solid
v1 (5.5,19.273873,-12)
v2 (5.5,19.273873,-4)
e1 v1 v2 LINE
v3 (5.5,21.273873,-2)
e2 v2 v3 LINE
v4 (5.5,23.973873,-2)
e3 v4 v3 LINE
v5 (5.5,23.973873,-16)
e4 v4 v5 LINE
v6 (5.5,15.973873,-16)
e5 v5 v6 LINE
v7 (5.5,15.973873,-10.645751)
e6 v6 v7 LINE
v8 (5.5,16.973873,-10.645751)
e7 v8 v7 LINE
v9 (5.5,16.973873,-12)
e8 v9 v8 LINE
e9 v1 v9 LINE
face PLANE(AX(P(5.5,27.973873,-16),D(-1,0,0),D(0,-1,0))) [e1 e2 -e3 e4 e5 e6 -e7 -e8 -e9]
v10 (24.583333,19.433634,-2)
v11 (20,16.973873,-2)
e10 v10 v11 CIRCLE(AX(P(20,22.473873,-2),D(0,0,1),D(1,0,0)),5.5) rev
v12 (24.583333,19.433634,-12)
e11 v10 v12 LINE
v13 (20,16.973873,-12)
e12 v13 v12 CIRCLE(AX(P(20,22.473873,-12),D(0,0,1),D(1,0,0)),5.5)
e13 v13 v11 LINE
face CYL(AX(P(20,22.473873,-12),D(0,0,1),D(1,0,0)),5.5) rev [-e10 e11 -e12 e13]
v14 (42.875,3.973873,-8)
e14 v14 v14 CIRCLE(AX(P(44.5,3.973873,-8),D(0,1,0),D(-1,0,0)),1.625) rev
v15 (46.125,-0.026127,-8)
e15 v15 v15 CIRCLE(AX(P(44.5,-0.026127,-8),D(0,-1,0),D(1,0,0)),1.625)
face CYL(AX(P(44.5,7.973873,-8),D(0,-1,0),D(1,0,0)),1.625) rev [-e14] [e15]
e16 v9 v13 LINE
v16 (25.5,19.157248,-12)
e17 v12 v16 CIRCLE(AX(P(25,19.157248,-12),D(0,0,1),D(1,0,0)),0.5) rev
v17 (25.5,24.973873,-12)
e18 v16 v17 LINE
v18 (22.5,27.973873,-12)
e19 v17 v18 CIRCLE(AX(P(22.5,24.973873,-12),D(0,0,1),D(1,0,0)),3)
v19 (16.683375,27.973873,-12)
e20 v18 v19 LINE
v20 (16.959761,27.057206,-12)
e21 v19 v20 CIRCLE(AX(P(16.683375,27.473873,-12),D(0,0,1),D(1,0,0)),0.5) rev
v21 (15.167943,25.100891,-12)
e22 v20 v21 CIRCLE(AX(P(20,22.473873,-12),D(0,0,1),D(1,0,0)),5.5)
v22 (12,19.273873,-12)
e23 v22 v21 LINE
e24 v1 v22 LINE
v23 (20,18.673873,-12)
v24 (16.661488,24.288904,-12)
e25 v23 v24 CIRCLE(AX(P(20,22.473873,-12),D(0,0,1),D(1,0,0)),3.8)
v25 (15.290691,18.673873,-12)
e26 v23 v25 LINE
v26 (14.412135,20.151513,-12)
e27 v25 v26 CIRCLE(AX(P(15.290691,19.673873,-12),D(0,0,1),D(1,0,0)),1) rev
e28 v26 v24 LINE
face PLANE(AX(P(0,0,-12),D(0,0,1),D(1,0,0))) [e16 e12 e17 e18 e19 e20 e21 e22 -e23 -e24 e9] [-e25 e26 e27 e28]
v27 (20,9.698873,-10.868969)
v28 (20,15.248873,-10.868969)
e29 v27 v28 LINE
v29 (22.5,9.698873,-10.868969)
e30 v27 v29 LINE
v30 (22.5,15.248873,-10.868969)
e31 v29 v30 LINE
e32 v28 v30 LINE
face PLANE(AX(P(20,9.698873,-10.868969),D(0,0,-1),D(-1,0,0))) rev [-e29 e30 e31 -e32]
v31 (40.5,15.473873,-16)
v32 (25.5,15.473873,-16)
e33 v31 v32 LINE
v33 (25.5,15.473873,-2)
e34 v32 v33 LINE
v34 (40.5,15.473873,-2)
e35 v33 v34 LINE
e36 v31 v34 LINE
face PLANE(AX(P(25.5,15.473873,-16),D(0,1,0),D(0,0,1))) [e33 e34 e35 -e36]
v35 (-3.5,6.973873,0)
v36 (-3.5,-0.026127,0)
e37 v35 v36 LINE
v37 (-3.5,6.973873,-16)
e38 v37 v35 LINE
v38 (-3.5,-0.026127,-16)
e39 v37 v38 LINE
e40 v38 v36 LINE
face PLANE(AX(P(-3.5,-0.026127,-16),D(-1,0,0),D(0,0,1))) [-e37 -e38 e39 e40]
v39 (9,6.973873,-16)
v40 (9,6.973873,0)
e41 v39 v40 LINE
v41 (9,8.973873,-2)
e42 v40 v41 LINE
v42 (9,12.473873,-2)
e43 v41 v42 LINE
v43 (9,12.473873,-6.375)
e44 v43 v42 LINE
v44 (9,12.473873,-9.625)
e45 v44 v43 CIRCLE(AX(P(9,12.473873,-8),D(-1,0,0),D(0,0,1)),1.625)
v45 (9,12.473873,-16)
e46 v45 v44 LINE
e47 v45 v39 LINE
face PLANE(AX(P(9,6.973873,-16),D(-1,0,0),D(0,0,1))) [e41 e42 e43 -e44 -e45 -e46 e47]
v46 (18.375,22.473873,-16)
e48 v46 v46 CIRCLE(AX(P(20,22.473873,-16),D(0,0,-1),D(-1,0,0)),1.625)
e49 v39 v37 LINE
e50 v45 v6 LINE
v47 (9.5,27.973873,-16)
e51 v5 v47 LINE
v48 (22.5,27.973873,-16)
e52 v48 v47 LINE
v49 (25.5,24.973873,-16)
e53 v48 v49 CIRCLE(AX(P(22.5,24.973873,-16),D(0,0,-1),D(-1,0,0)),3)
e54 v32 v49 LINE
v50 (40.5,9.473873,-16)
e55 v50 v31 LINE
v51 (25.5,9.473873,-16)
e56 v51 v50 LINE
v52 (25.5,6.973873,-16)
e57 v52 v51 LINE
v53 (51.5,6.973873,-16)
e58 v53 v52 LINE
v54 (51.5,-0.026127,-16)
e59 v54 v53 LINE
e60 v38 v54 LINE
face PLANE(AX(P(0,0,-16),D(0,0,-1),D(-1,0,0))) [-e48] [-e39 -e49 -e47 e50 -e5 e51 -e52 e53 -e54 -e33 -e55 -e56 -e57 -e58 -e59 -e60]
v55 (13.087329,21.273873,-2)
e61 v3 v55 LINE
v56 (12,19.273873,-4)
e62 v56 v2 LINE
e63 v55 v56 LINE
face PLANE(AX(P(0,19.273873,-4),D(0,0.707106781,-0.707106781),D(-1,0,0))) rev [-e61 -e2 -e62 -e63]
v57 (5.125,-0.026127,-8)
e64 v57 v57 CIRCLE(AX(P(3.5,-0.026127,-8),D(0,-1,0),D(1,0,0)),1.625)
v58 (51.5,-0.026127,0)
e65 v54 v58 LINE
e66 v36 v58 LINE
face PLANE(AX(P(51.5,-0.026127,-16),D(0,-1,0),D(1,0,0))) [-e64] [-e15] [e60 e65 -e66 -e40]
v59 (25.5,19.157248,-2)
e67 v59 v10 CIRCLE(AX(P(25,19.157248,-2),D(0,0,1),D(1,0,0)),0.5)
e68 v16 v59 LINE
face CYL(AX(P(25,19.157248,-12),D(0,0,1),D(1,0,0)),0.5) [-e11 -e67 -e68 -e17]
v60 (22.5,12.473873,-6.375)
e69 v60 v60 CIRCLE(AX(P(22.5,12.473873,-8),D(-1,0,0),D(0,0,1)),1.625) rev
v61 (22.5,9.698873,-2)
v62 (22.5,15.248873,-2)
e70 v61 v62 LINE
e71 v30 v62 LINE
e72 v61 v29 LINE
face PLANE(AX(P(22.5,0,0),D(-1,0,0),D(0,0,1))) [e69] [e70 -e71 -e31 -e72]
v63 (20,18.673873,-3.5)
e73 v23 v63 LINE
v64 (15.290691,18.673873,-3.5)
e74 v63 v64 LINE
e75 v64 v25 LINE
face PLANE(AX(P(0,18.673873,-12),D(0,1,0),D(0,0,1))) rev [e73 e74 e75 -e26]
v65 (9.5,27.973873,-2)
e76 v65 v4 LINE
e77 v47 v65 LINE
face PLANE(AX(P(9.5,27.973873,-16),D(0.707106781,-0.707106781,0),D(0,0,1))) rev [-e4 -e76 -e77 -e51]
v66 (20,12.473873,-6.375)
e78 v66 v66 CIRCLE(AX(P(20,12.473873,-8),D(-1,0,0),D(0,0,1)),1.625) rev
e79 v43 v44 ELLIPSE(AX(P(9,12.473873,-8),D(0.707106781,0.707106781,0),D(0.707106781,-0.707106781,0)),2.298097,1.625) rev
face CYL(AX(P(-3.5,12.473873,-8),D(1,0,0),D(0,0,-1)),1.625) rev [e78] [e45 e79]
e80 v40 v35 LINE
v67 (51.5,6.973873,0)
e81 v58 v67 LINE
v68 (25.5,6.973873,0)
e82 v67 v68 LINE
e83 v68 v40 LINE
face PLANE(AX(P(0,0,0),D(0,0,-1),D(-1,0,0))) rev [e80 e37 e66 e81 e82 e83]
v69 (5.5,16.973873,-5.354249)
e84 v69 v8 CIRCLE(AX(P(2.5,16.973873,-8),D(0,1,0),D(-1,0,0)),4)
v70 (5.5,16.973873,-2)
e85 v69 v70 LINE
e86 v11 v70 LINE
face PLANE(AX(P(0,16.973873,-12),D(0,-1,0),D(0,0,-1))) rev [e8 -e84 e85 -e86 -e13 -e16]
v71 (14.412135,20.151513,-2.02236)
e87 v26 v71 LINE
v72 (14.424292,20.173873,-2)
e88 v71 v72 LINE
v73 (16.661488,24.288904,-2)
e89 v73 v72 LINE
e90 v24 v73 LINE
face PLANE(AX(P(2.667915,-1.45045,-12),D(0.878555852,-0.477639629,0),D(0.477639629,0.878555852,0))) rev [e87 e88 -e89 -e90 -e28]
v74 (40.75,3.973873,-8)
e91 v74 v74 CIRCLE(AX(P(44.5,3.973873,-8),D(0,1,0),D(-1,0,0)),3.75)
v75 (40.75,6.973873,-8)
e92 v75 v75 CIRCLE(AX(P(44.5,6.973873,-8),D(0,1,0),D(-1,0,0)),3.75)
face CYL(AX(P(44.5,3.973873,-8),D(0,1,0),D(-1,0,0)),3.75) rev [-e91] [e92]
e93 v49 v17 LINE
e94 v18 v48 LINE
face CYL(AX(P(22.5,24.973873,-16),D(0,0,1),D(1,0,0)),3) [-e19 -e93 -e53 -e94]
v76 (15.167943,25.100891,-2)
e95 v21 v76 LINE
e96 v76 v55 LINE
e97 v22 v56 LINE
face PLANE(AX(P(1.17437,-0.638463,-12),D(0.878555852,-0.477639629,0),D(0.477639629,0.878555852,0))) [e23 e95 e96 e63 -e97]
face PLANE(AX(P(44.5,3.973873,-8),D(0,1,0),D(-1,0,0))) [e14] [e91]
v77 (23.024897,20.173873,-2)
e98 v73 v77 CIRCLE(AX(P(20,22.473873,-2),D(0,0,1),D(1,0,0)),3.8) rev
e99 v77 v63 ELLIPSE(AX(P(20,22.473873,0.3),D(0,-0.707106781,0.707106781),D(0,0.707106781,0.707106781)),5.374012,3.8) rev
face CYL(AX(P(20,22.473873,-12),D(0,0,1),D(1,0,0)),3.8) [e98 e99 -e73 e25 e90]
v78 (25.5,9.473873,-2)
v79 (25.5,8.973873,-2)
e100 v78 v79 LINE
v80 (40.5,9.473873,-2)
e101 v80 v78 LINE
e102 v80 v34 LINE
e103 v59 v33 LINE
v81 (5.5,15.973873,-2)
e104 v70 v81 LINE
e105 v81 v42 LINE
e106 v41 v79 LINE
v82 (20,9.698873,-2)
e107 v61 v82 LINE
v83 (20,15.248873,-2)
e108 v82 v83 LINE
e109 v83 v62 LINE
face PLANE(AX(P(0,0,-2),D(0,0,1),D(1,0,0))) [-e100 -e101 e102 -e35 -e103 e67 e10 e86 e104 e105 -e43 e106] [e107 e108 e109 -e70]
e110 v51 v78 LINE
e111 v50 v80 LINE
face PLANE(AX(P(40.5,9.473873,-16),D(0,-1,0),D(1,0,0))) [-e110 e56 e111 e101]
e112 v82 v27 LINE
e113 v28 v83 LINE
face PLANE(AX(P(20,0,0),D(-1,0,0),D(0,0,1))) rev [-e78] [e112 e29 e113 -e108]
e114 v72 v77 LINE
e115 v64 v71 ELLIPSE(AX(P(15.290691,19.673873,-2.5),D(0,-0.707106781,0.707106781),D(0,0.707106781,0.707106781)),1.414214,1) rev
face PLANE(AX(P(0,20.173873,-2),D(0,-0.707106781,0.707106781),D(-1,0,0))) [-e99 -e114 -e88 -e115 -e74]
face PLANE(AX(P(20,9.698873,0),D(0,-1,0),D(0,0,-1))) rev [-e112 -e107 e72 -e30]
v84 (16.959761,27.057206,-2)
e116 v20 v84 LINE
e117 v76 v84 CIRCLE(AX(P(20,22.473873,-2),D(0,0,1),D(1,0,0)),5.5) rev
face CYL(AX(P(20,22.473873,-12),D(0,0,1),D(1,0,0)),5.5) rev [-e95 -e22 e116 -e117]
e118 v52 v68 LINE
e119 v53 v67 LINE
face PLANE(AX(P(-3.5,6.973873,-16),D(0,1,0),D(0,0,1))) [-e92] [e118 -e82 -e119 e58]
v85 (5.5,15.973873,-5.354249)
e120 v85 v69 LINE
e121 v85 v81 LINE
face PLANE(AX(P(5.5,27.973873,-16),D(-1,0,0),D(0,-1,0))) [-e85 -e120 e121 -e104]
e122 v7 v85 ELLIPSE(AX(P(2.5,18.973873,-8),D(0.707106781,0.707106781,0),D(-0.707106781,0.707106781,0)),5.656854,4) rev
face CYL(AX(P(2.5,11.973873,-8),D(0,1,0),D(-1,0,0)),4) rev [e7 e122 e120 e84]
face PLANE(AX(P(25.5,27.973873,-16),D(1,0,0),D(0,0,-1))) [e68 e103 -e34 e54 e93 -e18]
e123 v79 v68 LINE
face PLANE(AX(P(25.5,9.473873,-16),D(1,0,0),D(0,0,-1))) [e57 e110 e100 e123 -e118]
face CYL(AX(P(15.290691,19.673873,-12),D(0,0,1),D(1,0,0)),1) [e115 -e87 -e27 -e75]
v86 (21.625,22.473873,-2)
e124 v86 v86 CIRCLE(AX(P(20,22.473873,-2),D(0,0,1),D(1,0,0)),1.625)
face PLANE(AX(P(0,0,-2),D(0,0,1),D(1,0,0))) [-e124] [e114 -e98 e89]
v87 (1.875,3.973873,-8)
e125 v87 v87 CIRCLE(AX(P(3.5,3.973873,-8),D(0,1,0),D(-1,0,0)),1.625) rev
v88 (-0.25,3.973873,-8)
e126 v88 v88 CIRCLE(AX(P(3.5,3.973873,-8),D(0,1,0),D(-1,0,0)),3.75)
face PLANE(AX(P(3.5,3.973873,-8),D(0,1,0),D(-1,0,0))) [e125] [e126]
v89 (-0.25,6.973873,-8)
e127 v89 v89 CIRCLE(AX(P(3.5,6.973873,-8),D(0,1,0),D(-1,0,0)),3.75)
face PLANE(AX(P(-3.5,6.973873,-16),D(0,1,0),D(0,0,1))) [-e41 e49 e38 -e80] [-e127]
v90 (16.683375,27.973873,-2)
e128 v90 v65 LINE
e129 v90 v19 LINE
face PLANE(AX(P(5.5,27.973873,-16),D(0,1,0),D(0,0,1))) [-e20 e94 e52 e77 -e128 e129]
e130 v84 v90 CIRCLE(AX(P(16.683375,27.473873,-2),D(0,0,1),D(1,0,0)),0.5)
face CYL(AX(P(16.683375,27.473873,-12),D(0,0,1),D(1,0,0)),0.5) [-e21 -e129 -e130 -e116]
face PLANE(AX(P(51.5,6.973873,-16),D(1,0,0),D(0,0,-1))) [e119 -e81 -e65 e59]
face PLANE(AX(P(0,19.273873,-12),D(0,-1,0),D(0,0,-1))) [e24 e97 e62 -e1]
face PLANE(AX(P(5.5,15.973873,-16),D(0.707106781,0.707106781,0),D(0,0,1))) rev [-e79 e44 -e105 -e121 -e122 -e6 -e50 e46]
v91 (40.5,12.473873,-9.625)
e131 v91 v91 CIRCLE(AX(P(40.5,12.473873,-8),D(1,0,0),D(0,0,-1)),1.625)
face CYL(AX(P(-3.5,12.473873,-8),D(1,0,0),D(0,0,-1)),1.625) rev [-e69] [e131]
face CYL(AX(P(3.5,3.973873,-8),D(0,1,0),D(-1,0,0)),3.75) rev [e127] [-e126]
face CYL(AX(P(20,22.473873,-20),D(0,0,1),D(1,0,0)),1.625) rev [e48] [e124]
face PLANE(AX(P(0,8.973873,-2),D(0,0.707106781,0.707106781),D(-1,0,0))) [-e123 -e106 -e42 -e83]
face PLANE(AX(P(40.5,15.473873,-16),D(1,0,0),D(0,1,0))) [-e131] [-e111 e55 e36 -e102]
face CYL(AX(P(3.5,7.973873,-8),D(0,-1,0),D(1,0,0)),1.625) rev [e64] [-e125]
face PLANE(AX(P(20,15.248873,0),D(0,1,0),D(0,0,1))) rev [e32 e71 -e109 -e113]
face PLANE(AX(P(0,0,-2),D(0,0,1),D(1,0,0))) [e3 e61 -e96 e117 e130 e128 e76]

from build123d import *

# Parameters (mm, degrees)
BOSS_EXTRUDE1_DEPTH = 16
CUT_EXTRUDE1_START  = 2
CUT_EXTRUDE1_DEPTH  = 14
SKETCH7_R           = 1.625
CUT_EXTRUDE2_DEPTH  = 55.539321396
CUT_EXTRUDE3_START  = -18
SKETCH8_W           = 10.868969255
SKETCH8_H           = 5.55
CUT_EXTRUDE3_DEPTH  = 2.5
SKETCH9_R           = 1.625
CUT_EXTRUDE4_DEPTH  = 8
SKETCH16_R          = 3.75
CUT_EXTRUDE9_DEPTH  = 3
SKETCH21_W          = 35
SKETCH21_H          = 21
CUT_EXTRUDE13_DEPTH = 2
FILLET2_R           = 0.5
FILLET3_R           = 3
FILLET4_R           = 1
CHAMFER3_SIZE       = 3.5
CHAMFER4_SIZE       = 4
SKETCH18_R          = 1.625
CUT_EXTRUDE11_DEPTH = 20
SKETCH19_R          = 4
CUT_EXTRUDE12_DEPTH = 5
CHAMFER9_SIZE       = 2
CHAMFER12_SIZE      = 1.5
CHAMFER11_SIZE      = 2


# Some blends are built 0.0001 mm under size
with BuildPart() as part:
    # Sketch4 → Boss-Extrude1 (new body)
    with BuildSketch(Plane.XY):
        Polygon((-3.5, -0.026126862), (-3.5, 6.973873138), (9, 6.973873138), (9, 12.473873138), (5.5, 12.473873138), (5.5, 27.973873138), (25.5, 27.973873138), (25.5, 15.473873138), (40.5, 15.473873138), (40.5, 9.473873138), (25.5, 9.473873138), (25.5, 6.973873138), (51.5, 6.973873138), (51.5, -0.026126862), align=None)
    extrude(amount=-BOSS_EXTRUDE1_DEPTH)

    # Sketch6 → Cut-Extrude1 (cut)
    with BuildSketch(Plane.XY.offset(CUT_EXTRUDE1_START)):
        with BuildLine():
            Line((12, 19.273873138), (5.5, 19.273873138))
            Line((5.5, 19.273873138), (5.5, 16.973873138))
            Line((5.5, 16.973873138), (20, 16.973873138))
            ThreePointArc((20, 16.973873138), (23.888996032, 18.58469458), (25.499999994, 22.473615007))
            Line((25.499999994, 22.473615007), (25.5, 27.973873138))
            Line((25.5, 27.973873138), (20, 27.973873138))
            ThreePointArc((20, 27.973873138), (17.189181506, 27.201377701), (15.167942816, 25.100891099))
            Line((15.167942816, 25.100891099), (12, 19.273873138))
        make_face()
        with BuildLine():
            Line((20, 18.673873138), (13.608794956, 18.673873138))
            Line((13.608794956, 18.673873138), (16.661487764, 24.28890373))
            ThreePointArc((16.661487764, 24.28890373), (23.26627588, 24.415893189), (20, 18.673873138))
        make_face(mode=Mode.SUBTRACT)
    extrude(amount=-CUT_EXTRUDE1_DEPTH, mode=Mode.SUBTRACT)

    # Sketch7 → Cut-Extrude2 (cut, through all)
    with BuildSketch(Plane(origin=(40.5, 0, 0), x_dir=(0, 0, -1), z_dir=(1, 0, 0))):
        with Locations((8, 12.473873138)):
            Circle(SKETCH7_R)
    extrude(amount=-CUT_EXTRUDE2_DEPTH, mode=Mode.SUBTRACT)

    # Sketch8 → Cut-Extrude3 (cut)
    with BuildSketch(Plane(origin=(40.5, 0, 0), x_dir=(0, 0, -1), z_dir=(1, 0, 0)).offset(CUT_EXTRUDE3_START)):
        with Locations((5.434484628, 12.473873138)):
            Rectangle(SKETCH8_W, SKETCH8_H)
    extrude(amount=-CUT_EXTRUDE3_DEPTH, mode=Mode.SUBTRACT)

    # Sketch9 → Cut-Extrude4 (cut)
    with BuildSketch(Plane.XZ.offset(0.026126862)):
        with Locations((3.5, -8)):
            Circle(SKETCH9_R)
        with Locations((44.5, -8)):
            Circle(SKETCH9_R)
    extrude(amount=-CUT_EXTRUDE4_DEPTH, mode=Mode.SUBTRACT)

    # Sketch16 → Cut-Extrude9 (cut)
    with BuildSketch(Plane(origin=(0, 6.973873138, 0), x_dir=(1, 0, 0), z_dir=(0, 1, 0))):
        with Locations(Location((3.5, 8, 0), (0, 0, 180))):
            Circle(SKETCH16_R)
        with Locations(Location((44.5, 8, 0), (0, 0, 180))):
            Circle(SKETCH16_R)
    extrude(amount=-CUT_EXTRUDE9_DEPTH, mode=Mode.SUBTRACT)

    # Sketch21 → Cut-Extrude13 (cut)
    with BuildSketch(Plane.XY):
        with Locations((23, 17.473873138)):
            Rectangle(SKETCH21_W, SKETCH21_H)
    extrude(amount=-CUT_EXTRUDE13_DEPTH, mode=Mode.SUBTRACT)

    # Fillet2
    fillet2_edges = [part.edges().sort_by_distance(p)[0] for p in [
        (20, 27.973873138, -7),
        (25.499999994, 22.473615007, -7),
    ]]
    fillet(fillet2_edges, radius=FILLET2_R)

    # Fillet3
    fillet3_edges = [part.edges().sort_by_distance(p)[0] for p in [
        (25.5, 27.973873138, -14),
    ]]
    fillet(fillet3_edges, radius=FILLET3_R)

    # Fillet4
    fillet4_edges = [part.edges().sort_by_distance(p)[0] for p in [
        (13.608794956, 18.673873138, -7),
    ]]
    fillet(fillet4_edges, radius=FILLET4_R)

    # Chamfer3
    # the kernel refuses this chamfer: 3.5 mm, written as the material it takes off along each edge
    with BuildSketch(Plane(origin=(5.5, 12.473873138, 7.000890458), x_dir=(-0.02749587661058662, 0.9996219169112968, 0), z_dir=(0, 0, -1))) as chamfer3_piece_1_section:
        Polygon((CHAMFER3_SIZE * 0.999621916911, CHAMFER3_SIZE * 0.0274958766106), (-CHAMFER3_SIZE * 0.0274958766106, CHAMFER3_SIZE * 0.999621916911), (0, 0), align=None)
    chamfer3_piece_1 = extrude(amount=22.376780916, mode=Mode.PRIVATE)
    chamfer3_piece_1 = split(chamfer3_piece_1, bisect_by=Plane(origin=(9, 13.630287679, -4.1875), z_dir=(-1, 0, 0)), keep=Keep.TOP, mode=Mode.PRIVATE)
    add(chamfer3_piece_1, mode=Mode.SUBTRACT)
    with BuildSketch(Plane(origin=(5.5, 12.473873138, -0.624109542), x_dir=(-0.02749587661058662, 0.9996219169112968, 0), z_dir=(0, 0, -1))) as chamfer3_piece_2_section:
        Polygon((CHAMFER3_SIZE * 0.999621916911, CHAMFER3_SIZE * 0.0274958766106), (-CHAMFER3_SIZE * 0.0274958766106, CHAMFER3_SIZE * 0.999621916911), (0, 0), align=None)
    chamfer3_piece_2 = extrude(amount=24.376780916, mode=Mode.PRIVATE)
    chamfer3_piece_2 = split(chamfer3_piece_2, bisect_by=Plane(origin=(9, 13.630287679, -12.8125), z_dir=(-1, 0, 0)), keep=Keep.TOP, mode=Mode.PRIVATE)
    add(chamfer3_piece_2, mode=Mode.SUBTRACT)

    # Chamfer4
    chamfer4_edges = [part.edges().sort_by_distance(p)[0] for p in [
        (5.5, 27.973873138, -9),
    ]]
    chamfer(chamfer4_edges, length=CHAMFER4_SIZE)

    # Sketch18 → Cut-Extrude11 (cut)
    with BuildSketch(Plane.XY):
        with Locations((20, 22.473873138)):
            Circle(SKETCH18_R)
    extrude(amount=-CUT_EXTRUDE11_DEPTH, mode=Mode.SUBTRACT)

    # Sketch19 → Cut-Extrude12 (cut)
    with BuildSketch(Plane(origin=(0, 16.973873138, 0), x_dir=(1, 0, 0), z_dir=(0, 1, 0))):
        with Locations((2.5, 8)):
            Circle(SKETCH19_R)
    extrude(amount=-CUT_EXTRUDE12_DEPTH, mode=Mode.SUBTRACT)

    # Chamfer9
    chamfer9_edges = [part.edges().sort_by_distance(p)[0] for p in [
        (17.25, 6.973873138, -2),
    ]]
    chamfer(chamfer9_edges, length=CHAMFER9_SIZE - 0.0001)  # a hair under: the kernel refuses the full size

    # Chamfer12
    # the kernel refuses this chamfer: 1.5 mm, written as the material it takes off along each edge
    with BuildSketch(Plane(origin=(23.857524482, 18.673873138, -2), x_dir=(0, 0.9996219169112968, 0.027495876610586334), z_dir=(-1, 0, 0))) as chamfer12_piece_1_section:
        Polygon((CHAMFER12_SIZE * 0.999621916911, CHAMFER12_SIZE * 0.0274958766106), (-CHAMFER12_SIZE * 0.0274958766106, CHAMFER12_SIZE * 0.999621916911), (0, 0), align=None)
    chamfer12_piece_1 = extrude(amount=12.424357944, mode=Mode.PRIVATE)
    chamfer12_piece_1 = split(chamfer12_piece_1, bisect_by=Plane(origin=(15.45343037, 22.066839589, -2.289421032), z_dir=(0.8785558517032834, -0.47763962925820797, 0)), keep=Keep.TOP, mode=Mode.PRIVATE)
    add(chamfer12_piece_1, mode=Mode.SUBTRACT)

    # Chamfer11
    chamfer11_edges = [part.edges().sort_by_distance(p)[0] for p in [
        (8.75, 19.273873138, -2),
    ]]
    chamfer(chamfer11_edges, length=CHAMFER11_SIZE)


solid = part.part
